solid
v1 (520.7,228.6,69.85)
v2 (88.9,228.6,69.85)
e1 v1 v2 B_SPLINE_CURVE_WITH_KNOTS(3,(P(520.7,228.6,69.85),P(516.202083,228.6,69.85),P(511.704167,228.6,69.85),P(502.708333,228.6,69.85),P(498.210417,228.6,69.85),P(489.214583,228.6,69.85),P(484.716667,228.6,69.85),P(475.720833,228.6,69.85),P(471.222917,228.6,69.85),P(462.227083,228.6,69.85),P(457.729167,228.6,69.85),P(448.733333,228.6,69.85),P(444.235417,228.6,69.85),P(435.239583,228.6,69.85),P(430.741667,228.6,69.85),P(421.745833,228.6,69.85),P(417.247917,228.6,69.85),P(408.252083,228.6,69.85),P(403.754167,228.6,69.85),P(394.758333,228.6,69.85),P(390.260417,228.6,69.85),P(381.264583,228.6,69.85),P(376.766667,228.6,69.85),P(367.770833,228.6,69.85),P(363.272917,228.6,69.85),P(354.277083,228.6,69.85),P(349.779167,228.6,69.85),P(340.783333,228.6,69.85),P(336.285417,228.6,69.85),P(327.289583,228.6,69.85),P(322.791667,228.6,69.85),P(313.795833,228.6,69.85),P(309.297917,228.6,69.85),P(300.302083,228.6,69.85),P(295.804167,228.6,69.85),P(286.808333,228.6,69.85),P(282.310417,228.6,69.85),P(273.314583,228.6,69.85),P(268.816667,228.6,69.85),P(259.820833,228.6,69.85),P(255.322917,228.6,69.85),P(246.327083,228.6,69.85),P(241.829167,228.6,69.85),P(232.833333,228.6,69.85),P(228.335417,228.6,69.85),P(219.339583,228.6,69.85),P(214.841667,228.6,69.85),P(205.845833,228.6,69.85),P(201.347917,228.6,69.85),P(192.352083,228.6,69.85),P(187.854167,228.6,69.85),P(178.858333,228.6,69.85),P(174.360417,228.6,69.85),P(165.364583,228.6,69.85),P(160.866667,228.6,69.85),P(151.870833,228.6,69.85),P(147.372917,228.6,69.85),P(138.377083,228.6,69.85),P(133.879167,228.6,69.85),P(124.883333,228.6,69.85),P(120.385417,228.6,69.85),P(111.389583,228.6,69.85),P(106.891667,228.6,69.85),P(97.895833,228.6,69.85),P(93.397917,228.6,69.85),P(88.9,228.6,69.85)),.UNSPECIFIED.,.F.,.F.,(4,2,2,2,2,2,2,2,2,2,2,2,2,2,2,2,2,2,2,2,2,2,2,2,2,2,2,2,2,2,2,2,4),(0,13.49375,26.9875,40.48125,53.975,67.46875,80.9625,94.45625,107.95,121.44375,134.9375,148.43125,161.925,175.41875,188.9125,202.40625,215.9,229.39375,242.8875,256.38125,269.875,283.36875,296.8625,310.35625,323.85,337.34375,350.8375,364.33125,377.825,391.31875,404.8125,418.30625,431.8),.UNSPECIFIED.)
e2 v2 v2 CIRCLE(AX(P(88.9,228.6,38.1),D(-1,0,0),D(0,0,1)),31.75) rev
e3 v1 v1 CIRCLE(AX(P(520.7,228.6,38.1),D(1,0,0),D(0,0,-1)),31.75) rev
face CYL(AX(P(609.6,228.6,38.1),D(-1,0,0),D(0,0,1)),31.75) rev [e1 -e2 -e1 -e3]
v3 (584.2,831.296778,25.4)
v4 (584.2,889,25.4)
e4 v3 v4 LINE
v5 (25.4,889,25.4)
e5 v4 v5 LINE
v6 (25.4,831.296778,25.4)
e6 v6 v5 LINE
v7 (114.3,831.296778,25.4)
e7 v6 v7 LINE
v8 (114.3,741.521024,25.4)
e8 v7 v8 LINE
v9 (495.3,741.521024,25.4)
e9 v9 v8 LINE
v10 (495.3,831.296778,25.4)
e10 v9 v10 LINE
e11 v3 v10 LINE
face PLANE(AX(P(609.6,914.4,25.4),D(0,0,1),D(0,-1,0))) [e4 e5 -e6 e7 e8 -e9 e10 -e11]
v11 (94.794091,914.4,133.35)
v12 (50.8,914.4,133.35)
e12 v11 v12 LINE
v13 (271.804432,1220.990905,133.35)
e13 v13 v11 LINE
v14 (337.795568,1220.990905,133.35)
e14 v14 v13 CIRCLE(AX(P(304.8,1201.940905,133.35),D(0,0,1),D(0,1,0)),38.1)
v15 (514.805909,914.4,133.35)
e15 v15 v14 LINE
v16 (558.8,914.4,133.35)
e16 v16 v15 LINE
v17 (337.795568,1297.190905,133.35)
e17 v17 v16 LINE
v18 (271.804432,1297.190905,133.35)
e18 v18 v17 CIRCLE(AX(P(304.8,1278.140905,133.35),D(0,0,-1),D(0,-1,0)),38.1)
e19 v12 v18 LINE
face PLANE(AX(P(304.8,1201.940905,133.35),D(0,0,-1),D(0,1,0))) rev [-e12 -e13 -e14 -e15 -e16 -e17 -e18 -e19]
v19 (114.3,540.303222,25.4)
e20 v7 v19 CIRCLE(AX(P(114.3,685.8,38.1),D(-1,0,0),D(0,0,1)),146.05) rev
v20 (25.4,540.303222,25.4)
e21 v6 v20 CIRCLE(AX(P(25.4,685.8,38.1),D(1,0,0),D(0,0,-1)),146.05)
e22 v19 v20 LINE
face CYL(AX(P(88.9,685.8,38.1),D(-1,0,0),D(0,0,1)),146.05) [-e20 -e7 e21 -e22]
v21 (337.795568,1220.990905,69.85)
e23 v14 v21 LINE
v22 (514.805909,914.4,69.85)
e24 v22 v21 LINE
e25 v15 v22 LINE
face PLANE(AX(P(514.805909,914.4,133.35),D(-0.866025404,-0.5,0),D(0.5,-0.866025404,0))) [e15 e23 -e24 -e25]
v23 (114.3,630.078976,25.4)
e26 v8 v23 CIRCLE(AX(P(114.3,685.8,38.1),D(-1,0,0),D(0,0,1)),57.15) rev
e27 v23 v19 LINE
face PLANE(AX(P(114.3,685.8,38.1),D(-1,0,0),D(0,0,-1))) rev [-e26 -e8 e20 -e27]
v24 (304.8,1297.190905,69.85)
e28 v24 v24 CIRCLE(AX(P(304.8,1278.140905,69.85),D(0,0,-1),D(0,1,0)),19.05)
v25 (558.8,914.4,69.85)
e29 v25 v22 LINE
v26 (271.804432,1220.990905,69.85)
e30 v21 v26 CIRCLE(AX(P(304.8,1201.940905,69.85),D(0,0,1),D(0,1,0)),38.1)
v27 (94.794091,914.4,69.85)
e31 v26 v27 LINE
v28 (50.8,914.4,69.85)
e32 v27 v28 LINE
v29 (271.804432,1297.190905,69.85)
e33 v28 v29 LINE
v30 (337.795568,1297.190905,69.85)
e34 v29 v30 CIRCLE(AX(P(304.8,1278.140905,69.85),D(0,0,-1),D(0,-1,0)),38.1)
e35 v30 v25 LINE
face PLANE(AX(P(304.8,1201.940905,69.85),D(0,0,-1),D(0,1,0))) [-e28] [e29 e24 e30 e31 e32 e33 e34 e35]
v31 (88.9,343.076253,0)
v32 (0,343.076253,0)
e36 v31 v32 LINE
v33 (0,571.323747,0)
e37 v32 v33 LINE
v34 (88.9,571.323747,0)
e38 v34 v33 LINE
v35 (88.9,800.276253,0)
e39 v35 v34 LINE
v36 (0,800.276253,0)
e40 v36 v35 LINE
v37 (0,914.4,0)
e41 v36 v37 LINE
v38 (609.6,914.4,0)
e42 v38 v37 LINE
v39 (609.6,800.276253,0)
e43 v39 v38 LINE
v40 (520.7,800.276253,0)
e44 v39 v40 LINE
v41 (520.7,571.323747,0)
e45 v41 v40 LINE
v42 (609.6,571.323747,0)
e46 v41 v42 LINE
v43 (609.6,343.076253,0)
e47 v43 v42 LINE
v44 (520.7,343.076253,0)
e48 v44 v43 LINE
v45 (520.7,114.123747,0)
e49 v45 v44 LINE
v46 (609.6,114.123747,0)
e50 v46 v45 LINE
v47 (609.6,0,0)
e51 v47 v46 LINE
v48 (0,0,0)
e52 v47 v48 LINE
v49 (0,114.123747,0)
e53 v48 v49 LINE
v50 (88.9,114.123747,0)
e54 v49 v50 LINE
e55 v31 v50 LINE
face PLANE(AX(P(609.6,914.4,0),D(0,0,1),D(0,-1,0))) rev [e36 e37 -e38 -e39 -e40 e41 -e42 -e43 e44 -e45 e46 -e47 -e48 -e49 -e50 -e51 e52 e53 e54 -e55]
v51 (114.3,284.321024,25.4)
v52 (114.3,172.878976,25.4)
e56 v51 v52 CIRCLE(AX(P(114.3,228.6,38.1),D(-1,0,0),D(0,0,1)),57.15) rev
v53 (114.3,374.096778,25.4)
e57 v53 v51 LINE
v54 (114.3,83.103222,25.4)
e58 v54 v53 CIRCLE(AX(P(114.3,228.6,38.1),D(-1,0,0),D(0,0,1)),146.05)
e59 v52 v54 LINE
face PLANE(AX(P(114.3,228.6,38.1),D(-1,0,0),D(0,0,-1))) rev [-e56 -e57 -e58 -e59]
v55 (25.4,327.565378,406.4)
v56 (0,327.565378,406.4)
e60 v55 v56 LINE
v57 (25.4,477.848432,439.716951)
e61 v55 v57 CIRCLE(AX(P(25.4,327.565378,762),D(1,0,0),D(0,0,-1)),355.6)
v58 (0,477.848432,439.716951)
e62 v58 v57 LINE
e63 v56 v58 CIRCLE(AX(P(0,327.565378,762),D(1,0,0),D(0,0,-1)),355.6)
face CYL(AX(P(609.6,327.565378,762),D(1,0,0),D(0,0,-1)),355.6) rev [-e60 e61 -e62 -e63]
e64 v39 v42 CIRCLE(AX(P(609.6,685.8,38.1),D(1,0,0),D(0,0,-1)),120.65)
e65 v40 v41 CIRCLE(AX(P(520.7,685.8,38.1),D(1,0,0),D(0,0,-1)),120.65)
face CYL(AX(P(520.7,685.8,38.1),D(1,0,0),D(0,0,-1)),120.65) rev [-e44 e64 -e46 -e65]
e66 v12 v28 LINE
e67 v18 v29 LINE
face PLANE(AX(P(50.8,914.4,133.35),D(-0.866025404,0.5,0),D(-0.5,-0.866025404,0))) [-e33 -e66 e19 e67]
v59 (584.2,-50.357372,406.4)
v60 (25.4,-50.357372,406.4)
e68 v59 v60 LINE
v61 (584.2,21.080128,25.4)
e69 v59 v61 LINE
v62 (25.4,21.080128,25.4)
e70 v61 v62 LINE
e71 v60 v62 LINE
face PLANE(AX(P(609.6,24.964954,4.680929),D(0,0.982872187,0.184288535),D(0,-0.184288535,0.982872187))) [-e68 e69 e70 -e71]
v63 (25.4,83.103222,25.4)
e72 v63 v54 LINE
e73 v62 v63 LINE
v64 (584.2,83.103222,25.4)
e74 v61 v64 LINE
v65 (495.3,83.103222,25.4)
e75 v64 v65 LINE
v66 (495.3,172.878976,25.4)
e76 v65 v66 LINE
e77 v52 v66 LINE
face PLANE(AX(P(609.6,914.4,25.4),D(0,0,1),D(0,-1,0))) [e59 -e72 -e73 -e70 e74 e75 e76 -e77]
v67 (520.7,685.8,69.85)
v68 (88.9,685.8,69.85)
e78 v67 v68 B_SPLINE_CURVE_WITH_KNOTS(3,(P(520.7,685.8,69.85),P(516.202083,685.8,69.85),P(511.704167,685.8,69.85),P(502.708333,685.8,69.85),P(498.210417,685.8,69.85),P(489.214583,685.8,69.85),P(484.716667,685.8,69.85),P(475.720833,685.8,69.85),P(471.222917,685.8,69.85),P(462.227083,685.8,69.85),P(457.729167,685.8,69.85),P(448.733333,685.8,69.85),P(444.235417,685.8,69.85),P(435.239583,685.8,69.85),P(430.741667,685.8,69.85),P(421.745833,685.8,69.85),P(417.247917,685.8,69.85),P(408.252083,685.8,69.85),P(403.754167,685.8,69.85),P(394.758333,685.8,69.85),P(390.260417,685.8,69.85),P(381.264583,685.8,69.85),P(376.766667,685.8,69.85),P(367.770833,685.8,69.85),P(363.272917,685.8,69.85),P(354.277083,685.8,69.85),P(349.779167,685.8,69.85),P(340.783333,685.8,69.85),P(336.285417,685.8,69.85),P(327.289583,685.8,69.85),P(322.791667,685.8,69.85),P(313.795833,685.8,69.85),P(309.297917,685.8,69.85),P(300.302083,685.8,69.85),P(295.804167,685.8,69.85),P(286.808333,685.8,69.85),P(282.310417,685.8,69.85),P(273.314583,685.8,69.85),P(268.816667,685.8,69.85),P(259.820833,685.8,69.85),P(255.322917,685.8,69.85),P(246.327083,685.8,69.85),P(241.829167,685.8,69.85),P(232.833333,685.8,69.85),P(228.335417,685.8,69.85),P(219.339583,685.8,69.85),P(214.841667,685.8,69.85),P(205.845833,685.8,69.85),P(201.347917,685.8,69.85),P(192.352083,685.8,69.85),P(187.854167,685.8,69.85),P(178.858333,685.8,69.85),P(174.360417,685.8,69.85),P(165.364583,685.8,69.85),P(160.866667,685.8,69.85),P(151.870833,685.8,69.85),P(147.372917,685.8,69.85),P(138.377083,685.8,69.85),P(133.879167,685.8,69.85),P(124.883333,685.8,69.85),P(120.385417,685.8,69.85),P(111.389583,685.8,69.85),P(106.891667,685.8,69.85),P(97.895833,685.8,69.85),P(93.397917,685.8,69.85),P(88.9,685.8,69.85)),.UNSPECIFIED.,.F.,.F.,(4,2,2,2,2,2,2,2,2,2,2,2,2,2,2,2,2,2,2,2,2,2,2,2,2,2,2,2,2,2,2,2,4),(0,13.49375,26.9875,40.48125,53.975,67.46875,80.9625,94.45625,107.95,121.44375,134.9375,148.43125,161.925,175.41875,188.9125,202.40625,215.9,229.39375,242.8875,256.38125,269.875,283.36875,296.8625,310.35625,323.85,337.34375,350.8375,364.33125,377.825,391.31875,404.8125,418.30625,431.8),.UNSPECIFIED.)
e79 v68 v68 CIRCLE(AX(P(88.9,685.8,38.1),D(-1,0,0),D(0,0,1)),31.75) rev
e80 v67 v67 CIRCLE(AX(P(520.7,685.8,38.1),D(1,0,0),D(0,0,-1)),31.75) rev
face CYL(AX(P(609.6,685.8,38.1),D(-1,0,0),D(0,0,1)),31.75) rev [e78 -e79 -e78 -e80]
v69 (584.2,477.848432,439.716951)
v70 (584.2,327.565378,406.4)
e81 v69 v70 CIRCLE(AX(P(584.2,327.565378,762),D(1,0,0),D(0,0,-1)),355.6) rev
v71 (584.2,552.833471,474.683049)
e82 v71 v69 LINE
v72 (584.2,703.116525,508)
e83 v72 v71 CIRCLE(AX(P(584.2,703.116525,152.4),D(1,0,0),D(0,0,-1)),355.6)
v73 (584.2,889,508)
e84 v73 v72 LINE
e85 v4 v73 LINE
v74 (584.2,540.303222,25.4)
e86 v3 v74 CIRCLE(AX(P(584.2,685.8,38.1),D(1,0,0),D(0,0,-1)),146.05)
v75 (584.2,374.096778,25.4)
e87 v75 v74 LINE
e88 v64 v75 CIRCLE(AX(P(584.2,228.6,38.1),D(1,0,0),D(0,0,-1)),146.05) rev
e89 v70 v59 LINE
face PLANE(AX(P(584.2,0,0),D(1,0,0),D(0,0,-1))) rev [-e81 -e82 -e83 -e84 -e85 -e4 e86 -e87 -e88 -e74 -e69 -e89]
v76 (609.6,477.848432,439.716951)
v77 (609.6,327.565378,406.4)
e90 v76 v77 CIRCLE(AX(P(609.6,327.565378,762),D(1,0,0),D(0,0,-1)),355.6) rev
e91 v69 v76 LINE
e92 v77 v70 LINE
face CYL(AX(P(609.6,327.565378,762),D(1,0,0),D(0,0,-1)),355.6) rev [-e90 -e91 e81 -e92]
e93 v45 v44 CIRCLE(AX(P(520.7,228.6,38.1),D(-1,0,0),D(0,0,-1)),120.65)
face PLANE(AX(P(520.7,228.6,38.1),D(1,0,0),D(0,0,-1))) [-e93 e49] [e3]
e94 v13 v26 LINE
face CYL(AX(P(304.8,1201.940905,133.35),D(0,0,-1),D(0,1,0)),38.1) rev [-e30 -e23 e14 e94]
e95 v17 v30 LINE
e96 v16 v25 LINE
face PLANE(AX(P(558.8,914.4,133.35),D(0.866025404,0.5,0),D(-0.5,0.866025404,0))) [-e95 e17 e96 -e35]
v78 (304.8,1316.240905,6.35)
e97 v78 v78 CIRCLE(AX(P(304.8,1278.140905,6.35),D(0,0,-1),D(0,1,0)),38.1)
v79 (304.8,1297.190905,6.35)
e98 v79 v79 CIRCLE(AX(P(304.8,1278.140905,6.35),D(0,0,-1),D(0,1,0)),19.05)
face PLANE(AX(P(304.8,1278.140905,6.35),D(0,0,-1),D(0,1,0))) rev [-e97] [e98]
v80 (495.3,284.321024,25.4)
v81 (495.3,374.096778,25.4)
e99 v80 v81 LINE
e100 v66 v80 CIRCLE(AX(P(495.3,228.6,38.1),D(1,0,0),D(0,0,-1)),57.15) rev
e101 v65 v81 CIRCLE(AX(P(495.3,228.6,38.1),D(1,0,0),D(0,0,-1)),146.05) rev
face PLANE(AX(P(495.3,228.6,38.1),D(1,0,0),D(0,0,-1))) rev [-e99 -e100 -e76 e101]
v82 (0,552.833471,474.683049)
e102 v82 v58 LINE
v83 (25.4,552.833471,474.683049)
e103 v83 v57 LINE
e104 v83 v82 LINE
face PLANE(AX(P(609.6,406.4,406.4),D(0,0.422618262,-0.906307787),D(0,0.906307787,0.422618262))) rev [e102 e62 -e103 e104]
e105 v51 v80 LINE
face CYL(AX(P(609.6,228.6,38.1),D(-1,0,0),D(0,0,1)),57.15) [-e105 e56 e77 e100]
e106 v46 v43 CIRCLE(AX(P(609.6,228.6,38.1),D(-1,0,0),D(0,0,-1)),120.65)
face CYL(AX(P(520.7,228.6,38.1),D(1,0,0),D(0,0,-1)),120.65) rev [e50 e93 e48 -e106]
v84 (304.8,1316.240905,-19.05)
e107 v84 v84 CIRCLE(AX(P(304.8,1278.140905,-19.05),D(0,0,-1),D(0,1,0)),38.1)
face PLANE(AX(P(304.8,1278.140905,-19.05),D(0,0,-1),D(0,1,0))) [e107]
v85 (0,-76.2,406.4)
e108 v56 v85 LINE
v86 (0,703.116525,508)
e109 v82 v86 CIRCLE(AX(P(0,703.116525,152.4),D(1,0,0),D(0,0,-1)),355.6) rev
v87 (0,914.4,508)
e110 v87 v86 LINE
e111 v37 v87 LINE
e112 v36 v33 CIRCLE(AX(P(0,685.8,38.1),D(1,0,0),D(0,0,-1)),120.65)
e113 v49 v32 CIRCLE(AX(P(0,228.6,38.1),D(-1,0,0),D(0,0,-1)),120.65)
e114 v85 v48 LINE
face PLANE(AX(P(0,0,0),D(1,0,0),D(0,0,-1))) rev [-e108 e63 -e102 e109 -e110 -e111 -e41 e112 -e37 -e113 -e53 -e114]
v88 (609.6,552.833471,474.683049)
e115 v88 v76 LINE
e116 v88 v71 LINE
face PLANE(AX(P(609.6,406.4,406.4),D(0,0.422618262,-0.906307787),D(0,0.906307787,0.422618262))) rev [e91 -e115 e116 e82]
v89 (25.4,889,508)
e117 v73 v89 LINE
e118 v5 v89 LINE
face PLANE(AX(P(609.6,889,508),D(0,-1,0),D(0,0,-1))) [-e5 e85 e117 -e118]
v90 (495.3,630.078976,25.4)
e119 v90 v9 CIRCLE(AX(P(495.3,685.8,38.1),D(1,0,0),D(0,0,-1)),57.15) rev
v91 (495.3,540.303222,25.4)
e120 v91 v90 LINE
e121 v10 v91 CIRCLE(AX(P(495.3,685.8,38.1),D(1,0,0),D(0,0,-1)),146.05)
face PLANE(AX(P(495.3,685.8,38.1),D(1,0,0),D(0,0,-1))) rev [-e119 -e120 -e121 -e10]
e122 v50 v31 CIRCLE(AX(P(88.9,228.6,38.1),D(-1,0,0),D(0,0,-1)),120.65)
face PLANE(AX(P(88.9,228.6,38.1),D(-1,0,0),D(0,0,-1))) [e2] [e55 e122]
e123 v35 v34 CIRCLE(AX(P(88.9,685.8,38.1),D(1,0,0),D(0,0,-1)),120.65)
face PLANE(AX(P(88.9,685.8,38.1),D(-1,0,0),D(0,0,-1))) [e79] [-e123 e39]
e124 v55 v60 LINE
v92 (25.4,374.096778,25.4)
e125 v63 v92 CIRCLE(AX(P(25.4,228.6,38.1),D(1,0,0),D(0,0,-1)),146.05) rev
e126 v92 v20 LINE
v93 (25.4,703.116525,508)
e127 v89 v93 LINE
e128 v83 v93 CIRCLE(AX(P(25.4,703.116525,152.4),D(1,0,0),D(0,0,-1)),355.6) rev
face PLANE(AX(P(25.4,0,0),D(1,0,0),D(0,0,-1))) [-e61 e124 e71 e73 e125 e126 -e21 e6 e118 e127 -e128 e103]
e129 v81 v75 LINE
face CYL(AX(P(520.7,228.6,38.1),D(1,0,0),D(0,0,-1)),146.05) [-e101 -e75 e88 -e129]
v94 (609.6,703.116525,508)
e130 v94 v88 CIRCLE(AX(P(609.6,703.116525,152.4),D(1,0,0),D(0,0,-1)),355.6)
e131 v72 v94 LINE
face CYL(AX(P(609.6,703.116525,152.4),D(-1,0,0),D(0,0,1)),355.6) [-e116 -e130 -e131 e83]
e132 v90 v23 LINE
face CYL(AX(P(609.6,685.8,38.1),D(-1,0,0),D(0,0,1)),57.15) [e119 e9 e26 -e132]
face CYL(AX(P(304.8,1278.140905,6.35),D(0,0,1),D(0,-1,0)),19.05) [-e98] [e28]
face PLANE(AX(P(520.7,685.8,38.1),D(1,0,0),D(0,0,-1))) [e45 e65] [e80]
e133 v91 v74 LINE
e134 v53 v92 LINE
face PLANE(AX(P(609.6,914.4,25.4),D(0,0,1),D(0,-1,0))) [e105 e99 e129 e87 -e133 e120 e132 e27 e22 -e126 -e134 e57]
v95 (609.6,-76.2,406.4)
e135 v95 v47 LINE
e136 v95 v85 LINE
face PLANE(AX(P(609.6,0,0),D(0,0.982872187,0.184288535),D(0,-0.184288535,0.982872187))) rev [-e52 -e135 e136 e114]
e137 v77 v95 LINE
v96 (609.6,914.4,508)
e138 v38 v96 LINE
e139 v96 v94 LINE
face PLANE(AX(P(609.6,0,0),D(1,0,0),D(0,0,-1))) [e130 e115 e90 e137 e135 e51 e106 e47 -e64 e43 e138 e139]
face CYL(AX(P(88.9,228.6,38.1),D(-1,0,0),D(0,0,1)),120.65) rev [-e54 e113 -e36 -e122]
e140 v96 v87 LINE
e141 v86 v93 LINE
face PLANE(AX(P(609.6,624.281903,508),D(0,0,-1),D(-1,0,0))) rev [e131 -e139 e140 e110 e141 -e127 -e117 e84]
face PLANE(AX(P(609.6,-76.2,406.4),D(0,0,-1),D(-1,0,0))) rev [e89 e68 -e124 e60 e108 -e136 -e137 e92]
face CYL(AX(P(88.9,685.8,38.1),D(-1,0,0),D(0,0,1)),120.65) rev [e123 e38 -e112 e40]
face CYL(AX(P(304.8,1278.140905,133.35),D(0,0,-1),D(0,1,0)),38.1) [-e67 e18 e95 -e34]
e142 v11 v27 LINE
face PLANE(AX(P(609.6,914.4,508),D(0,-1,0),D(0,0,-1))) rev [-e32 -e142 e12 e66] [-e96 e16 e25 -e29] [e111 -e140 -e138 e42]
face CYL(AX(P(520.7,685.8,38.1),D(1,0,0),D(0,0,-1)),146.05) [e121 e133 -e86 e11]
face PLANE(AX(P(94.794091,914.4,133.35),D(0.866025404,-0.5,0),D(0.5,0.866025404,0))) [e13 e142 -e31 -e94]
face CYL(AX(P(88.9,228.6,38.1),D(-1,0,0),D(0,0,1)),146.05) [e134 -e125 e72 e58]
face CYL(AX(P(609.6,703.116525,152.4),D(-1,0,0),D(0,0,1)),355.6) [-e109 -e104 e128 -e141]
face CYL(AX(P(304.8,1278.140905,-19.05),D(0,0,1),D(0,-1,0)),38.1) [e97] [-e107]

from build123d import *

# Parameters (mm, degrees)
BOSS_EXTRUDE1_DEPTH                        = 609.6
FILLET1_R                                  = 355.6
SKETCH2_R                                  = 31.75
CUT_EXTRUDE1_DEPTH                         = 609.6
SKETCH4_R                                  = 120.65
CUT_EXTRUDE2_DEPTH                         = 88.9
MIRROR1_AT_THE_SECOND_PLANE_COPY_1_SKETC_R = 120.65
MIRROR1_AT_THE_SECOND_PLANE_COPY_1_DEPTH   = 88.9
SHELL1_START                               = 25.4
SHELL1_DEPTH                               = 558.8
SHELL1_START_2                             = 114.3
SHELL1_2_DEPTH                             = 381
BOSS_EXTRUDE6_START                        = -69.85
BOSS_EXTRUDE6_DEPTH                        = 63.5
SKETCH8_R                                  = 19.05
BOSS_EXTRUDE7_DEPTH                        = 63.5
BOSS_EXTRUDE8_START                        = 25.4
SKETCH9_R                                  = 38.1
BOSS_EXTRUDE8_DEPTH                        = 25.4


# Read off the part's stored shape, not the designer's step: Shell1
with BuildPart() as part:
    # Sketch1 → Boss-Extrude1 (new body)
    with BuildSketch(Plane(origin=(0, 0, 0), x_dir=(0, 0, -1), z_dir=(1, 0, 0))):
        Polygon((0, 0), (-406.4, -76.2), (-406.4, 406.4), (-508, 624.281903124), (-508, 914.4), (0, 914.4), align=None)
    extrude(amount=BOSS_EXTRUDE1_DEPTH)

    # Fillet1
    fillet1_edges = [part.edges().sort_by_distance(p)[0] for p in [
        (304.8, 406.4, 406.4),
        (304.8, 624.281903124, 508),
    ]]
    fillet(fillet1_edges, radius=FILLET1_R)

    # Sketch2 → Cut-Extrude1 (cut)
    with BuildSketch(Plane.ZY):
        with Locations((38.1, 228.6)):
            Circle(SKETCH2_R)
        with Locations((38.1, 685.8)):
            Circle(SKETCH2_R)
    extrude(amount=-CUT_EXTRUDE1_DEPTH, mode=Mode.SUBTRACT)

    # Sketch4 → Cut-Extrude2 (cut)
    with BuildSketch(Plane(origin=(609.6, 0, 0), x_dir=(0, 0, -1), z_dir=(1, 0, 0))):
        with Locations((-38.1, 685.8)):
            Circle(SKETCH4_R)
    cut_extrude2 = extrude(amount=-CUT_EXTRUDE2_DEPTH, mode=Mode.SUBTRACT)

    # Mirror1: Cut-Extrude2 across plane
    add(cut_extrude2.mirror(Plane(origin=(304.8, 0, 0), x_dir=(0, 0, 1), z_dir=(1, 0, 0))), mode=Mode.SUBTRACT)

    # Mirror1 at the second plane: Cut-Extrude2 across plane
    add(cut_extrude2.mirror(Plane.ZX.offset(457.2)), mode=Mode.SUBTRACT)

    # Mirror1 at the second plane copy 1 sketc → Mirror1 at the second plane copy 1 (cut)
    with BuildSketch(Plane(origin=(0, 914.4, 0), x_dir=(0, 0, -1), z_dir=(-1, 0, 0))):
        with Locations((-38.1, 685.8)):
            Circle(MIRROR1_AT_THE_SECOND_PLANE_COPY_1_SKETC_R)
    extrude(amount=-MIRROR1_AT_THE_SECOND_PLANE_COPY_1_DEPTH, mode=Mode.SUBTRACT)

    # Shell1 outline → Shell1 (cut)
    with BuildSketch(Plane.YZ.offset(SHELL1_START)):
        with BuildLine():
            Line((374.096778315, 25.4), (540.303221685, 25.4))
            ThreePointArc((540.303221685, 25.4), (685.8, 184.15), (831.296778315, 25.4))
            Line((831.296778315, 25.4), (889, 25.4))
            Line((889, 25.4), (889, 508))
            Line((889, 508), (703.11652516, 508))
            ThreePointArc((703.11652516, 508), (626.150598444, 499.570860132), (552.833471285, 474.68304907))
            Line((552.833471285, 474.68304907), (477.848431839, 439.71695093))
            ThreePointArc((477.848431839, 439.71695093), (404.53130468, 414.829139868), (327.565377964, 406.4))
            Line((327.565377964, 406.4), (-50.357372304, 406.4))
            Line((-50.357372304, 406.4), (21.080127696, 25.4))
            Line((21.080127696, 25.4), (83.103221685, 25.4))
            ThreePointArc((83.103221685, 25.4), (228.6, 184.15), (374.096778315, 25.4))
        make_face()
    extrude(amount=SHELL1_DEPTH, mode=Mode.SUBTRACT)

    # Shell1 2 outline → Shell1 2 (cut)
    with BuildSketch(Plane.YZ.offset(SHELL1_START_2)):
        with BuildLine():
            Line((540.303221685, 25.4), (630.07897614, 25.4))
            ThreePointArc((630.07897614, 25.4), (685.8, 95.25), (741.52102386, 25.4))
            Line((741.52102386, 25.4), (831.296778315, 25.4))
            ThreePointArc((831.296778315, 25.4), (685.8, 184.15), (540.303221685, 25.4))
        make_face()
        with BuildLine():
            Line((284.32102386, 25.4), (374.096778315, 25.4))
            ThreePointArc((374.096778315, 25.4), (228.6, 184.15), (83.103221685, 25.4))
            Line((83.103221685, 25.4), (172.87897614, 25.4))
            ThreePointArc((172.87897614, 25.4), (228.6, 95.25), (284.32102386, 25.4))
        make_face()
    extrude(amount=SHELL1_2_DEPTH, mode=Mode.SUBTRACT)

    # Sketch6 → Boss-Extrude6 (add)
    with BuildSketch(Plane(origin=(0, 0, 0), x_dir=(-1, 0, 0), z_dir=(0, 0, -1)).offset(BOSS_EXTRUDE6_START)):
        with BuildLine():
            Line((-558.8, 914.4), (-514.805909488, 914.4))
            Line((-514.805909488, 914.4), (-337.795567884, 1220.990905122))
            ThreePointArc((-337.795567884, 1220.990905122), (-304.8, 1240.040905122), (-271.804432116, 1220.990905122))
            Line((-271.804432116, 1220.990905122), (-94.794090512, 914.4))
            Line((-94.794090512, 914.4), (-50.8, 914.4))
            Line((-50.8, 914.4), (-271.804432116, 1297.190905122))
            ThreePointArc((-271.804432116, 1297.190905122), (-304.8, 1316.240905122), (-337.795567884, 1297.190905122))
            Line((-337.795567884, 1297.190905122), (-558.8, 914.4))
        make_face()
    extrude(amount=-BOSS_EXTRUDE6_DEPTH)

    # Sketch8 → Boss-Extrude7 (add)
    with BuildSketch(Plane(origin=(0, 0, 69.85), x_dir=(-1, 0, 0), z_dir=(0, 0, -1))):
        with Locations(Location((-304.8, 1278.140905122, 0), (0, 0, 90))):
            Circle(SKETCH8_R)
    extrude(amount=BOSS_EXTRUDE7_DEPTH)

    # Sketch9 → Boss-Extrude8 (add)
    with BuildSketch(Plane(origin=(0, 0, 6.35), x_dir=(-1, 0, 0), z_dir=(0, 0, -1)).offset(BOSS_EXTRUDE8_START)):
        with Locations(Location((-304.8, 1278.140905122, 0), (0, 0, 90))):
            Circle(SKETCH9_R)
    extrude(amount=-BOSS_EXTRUDE8_DEPTH)


solid = part.part
